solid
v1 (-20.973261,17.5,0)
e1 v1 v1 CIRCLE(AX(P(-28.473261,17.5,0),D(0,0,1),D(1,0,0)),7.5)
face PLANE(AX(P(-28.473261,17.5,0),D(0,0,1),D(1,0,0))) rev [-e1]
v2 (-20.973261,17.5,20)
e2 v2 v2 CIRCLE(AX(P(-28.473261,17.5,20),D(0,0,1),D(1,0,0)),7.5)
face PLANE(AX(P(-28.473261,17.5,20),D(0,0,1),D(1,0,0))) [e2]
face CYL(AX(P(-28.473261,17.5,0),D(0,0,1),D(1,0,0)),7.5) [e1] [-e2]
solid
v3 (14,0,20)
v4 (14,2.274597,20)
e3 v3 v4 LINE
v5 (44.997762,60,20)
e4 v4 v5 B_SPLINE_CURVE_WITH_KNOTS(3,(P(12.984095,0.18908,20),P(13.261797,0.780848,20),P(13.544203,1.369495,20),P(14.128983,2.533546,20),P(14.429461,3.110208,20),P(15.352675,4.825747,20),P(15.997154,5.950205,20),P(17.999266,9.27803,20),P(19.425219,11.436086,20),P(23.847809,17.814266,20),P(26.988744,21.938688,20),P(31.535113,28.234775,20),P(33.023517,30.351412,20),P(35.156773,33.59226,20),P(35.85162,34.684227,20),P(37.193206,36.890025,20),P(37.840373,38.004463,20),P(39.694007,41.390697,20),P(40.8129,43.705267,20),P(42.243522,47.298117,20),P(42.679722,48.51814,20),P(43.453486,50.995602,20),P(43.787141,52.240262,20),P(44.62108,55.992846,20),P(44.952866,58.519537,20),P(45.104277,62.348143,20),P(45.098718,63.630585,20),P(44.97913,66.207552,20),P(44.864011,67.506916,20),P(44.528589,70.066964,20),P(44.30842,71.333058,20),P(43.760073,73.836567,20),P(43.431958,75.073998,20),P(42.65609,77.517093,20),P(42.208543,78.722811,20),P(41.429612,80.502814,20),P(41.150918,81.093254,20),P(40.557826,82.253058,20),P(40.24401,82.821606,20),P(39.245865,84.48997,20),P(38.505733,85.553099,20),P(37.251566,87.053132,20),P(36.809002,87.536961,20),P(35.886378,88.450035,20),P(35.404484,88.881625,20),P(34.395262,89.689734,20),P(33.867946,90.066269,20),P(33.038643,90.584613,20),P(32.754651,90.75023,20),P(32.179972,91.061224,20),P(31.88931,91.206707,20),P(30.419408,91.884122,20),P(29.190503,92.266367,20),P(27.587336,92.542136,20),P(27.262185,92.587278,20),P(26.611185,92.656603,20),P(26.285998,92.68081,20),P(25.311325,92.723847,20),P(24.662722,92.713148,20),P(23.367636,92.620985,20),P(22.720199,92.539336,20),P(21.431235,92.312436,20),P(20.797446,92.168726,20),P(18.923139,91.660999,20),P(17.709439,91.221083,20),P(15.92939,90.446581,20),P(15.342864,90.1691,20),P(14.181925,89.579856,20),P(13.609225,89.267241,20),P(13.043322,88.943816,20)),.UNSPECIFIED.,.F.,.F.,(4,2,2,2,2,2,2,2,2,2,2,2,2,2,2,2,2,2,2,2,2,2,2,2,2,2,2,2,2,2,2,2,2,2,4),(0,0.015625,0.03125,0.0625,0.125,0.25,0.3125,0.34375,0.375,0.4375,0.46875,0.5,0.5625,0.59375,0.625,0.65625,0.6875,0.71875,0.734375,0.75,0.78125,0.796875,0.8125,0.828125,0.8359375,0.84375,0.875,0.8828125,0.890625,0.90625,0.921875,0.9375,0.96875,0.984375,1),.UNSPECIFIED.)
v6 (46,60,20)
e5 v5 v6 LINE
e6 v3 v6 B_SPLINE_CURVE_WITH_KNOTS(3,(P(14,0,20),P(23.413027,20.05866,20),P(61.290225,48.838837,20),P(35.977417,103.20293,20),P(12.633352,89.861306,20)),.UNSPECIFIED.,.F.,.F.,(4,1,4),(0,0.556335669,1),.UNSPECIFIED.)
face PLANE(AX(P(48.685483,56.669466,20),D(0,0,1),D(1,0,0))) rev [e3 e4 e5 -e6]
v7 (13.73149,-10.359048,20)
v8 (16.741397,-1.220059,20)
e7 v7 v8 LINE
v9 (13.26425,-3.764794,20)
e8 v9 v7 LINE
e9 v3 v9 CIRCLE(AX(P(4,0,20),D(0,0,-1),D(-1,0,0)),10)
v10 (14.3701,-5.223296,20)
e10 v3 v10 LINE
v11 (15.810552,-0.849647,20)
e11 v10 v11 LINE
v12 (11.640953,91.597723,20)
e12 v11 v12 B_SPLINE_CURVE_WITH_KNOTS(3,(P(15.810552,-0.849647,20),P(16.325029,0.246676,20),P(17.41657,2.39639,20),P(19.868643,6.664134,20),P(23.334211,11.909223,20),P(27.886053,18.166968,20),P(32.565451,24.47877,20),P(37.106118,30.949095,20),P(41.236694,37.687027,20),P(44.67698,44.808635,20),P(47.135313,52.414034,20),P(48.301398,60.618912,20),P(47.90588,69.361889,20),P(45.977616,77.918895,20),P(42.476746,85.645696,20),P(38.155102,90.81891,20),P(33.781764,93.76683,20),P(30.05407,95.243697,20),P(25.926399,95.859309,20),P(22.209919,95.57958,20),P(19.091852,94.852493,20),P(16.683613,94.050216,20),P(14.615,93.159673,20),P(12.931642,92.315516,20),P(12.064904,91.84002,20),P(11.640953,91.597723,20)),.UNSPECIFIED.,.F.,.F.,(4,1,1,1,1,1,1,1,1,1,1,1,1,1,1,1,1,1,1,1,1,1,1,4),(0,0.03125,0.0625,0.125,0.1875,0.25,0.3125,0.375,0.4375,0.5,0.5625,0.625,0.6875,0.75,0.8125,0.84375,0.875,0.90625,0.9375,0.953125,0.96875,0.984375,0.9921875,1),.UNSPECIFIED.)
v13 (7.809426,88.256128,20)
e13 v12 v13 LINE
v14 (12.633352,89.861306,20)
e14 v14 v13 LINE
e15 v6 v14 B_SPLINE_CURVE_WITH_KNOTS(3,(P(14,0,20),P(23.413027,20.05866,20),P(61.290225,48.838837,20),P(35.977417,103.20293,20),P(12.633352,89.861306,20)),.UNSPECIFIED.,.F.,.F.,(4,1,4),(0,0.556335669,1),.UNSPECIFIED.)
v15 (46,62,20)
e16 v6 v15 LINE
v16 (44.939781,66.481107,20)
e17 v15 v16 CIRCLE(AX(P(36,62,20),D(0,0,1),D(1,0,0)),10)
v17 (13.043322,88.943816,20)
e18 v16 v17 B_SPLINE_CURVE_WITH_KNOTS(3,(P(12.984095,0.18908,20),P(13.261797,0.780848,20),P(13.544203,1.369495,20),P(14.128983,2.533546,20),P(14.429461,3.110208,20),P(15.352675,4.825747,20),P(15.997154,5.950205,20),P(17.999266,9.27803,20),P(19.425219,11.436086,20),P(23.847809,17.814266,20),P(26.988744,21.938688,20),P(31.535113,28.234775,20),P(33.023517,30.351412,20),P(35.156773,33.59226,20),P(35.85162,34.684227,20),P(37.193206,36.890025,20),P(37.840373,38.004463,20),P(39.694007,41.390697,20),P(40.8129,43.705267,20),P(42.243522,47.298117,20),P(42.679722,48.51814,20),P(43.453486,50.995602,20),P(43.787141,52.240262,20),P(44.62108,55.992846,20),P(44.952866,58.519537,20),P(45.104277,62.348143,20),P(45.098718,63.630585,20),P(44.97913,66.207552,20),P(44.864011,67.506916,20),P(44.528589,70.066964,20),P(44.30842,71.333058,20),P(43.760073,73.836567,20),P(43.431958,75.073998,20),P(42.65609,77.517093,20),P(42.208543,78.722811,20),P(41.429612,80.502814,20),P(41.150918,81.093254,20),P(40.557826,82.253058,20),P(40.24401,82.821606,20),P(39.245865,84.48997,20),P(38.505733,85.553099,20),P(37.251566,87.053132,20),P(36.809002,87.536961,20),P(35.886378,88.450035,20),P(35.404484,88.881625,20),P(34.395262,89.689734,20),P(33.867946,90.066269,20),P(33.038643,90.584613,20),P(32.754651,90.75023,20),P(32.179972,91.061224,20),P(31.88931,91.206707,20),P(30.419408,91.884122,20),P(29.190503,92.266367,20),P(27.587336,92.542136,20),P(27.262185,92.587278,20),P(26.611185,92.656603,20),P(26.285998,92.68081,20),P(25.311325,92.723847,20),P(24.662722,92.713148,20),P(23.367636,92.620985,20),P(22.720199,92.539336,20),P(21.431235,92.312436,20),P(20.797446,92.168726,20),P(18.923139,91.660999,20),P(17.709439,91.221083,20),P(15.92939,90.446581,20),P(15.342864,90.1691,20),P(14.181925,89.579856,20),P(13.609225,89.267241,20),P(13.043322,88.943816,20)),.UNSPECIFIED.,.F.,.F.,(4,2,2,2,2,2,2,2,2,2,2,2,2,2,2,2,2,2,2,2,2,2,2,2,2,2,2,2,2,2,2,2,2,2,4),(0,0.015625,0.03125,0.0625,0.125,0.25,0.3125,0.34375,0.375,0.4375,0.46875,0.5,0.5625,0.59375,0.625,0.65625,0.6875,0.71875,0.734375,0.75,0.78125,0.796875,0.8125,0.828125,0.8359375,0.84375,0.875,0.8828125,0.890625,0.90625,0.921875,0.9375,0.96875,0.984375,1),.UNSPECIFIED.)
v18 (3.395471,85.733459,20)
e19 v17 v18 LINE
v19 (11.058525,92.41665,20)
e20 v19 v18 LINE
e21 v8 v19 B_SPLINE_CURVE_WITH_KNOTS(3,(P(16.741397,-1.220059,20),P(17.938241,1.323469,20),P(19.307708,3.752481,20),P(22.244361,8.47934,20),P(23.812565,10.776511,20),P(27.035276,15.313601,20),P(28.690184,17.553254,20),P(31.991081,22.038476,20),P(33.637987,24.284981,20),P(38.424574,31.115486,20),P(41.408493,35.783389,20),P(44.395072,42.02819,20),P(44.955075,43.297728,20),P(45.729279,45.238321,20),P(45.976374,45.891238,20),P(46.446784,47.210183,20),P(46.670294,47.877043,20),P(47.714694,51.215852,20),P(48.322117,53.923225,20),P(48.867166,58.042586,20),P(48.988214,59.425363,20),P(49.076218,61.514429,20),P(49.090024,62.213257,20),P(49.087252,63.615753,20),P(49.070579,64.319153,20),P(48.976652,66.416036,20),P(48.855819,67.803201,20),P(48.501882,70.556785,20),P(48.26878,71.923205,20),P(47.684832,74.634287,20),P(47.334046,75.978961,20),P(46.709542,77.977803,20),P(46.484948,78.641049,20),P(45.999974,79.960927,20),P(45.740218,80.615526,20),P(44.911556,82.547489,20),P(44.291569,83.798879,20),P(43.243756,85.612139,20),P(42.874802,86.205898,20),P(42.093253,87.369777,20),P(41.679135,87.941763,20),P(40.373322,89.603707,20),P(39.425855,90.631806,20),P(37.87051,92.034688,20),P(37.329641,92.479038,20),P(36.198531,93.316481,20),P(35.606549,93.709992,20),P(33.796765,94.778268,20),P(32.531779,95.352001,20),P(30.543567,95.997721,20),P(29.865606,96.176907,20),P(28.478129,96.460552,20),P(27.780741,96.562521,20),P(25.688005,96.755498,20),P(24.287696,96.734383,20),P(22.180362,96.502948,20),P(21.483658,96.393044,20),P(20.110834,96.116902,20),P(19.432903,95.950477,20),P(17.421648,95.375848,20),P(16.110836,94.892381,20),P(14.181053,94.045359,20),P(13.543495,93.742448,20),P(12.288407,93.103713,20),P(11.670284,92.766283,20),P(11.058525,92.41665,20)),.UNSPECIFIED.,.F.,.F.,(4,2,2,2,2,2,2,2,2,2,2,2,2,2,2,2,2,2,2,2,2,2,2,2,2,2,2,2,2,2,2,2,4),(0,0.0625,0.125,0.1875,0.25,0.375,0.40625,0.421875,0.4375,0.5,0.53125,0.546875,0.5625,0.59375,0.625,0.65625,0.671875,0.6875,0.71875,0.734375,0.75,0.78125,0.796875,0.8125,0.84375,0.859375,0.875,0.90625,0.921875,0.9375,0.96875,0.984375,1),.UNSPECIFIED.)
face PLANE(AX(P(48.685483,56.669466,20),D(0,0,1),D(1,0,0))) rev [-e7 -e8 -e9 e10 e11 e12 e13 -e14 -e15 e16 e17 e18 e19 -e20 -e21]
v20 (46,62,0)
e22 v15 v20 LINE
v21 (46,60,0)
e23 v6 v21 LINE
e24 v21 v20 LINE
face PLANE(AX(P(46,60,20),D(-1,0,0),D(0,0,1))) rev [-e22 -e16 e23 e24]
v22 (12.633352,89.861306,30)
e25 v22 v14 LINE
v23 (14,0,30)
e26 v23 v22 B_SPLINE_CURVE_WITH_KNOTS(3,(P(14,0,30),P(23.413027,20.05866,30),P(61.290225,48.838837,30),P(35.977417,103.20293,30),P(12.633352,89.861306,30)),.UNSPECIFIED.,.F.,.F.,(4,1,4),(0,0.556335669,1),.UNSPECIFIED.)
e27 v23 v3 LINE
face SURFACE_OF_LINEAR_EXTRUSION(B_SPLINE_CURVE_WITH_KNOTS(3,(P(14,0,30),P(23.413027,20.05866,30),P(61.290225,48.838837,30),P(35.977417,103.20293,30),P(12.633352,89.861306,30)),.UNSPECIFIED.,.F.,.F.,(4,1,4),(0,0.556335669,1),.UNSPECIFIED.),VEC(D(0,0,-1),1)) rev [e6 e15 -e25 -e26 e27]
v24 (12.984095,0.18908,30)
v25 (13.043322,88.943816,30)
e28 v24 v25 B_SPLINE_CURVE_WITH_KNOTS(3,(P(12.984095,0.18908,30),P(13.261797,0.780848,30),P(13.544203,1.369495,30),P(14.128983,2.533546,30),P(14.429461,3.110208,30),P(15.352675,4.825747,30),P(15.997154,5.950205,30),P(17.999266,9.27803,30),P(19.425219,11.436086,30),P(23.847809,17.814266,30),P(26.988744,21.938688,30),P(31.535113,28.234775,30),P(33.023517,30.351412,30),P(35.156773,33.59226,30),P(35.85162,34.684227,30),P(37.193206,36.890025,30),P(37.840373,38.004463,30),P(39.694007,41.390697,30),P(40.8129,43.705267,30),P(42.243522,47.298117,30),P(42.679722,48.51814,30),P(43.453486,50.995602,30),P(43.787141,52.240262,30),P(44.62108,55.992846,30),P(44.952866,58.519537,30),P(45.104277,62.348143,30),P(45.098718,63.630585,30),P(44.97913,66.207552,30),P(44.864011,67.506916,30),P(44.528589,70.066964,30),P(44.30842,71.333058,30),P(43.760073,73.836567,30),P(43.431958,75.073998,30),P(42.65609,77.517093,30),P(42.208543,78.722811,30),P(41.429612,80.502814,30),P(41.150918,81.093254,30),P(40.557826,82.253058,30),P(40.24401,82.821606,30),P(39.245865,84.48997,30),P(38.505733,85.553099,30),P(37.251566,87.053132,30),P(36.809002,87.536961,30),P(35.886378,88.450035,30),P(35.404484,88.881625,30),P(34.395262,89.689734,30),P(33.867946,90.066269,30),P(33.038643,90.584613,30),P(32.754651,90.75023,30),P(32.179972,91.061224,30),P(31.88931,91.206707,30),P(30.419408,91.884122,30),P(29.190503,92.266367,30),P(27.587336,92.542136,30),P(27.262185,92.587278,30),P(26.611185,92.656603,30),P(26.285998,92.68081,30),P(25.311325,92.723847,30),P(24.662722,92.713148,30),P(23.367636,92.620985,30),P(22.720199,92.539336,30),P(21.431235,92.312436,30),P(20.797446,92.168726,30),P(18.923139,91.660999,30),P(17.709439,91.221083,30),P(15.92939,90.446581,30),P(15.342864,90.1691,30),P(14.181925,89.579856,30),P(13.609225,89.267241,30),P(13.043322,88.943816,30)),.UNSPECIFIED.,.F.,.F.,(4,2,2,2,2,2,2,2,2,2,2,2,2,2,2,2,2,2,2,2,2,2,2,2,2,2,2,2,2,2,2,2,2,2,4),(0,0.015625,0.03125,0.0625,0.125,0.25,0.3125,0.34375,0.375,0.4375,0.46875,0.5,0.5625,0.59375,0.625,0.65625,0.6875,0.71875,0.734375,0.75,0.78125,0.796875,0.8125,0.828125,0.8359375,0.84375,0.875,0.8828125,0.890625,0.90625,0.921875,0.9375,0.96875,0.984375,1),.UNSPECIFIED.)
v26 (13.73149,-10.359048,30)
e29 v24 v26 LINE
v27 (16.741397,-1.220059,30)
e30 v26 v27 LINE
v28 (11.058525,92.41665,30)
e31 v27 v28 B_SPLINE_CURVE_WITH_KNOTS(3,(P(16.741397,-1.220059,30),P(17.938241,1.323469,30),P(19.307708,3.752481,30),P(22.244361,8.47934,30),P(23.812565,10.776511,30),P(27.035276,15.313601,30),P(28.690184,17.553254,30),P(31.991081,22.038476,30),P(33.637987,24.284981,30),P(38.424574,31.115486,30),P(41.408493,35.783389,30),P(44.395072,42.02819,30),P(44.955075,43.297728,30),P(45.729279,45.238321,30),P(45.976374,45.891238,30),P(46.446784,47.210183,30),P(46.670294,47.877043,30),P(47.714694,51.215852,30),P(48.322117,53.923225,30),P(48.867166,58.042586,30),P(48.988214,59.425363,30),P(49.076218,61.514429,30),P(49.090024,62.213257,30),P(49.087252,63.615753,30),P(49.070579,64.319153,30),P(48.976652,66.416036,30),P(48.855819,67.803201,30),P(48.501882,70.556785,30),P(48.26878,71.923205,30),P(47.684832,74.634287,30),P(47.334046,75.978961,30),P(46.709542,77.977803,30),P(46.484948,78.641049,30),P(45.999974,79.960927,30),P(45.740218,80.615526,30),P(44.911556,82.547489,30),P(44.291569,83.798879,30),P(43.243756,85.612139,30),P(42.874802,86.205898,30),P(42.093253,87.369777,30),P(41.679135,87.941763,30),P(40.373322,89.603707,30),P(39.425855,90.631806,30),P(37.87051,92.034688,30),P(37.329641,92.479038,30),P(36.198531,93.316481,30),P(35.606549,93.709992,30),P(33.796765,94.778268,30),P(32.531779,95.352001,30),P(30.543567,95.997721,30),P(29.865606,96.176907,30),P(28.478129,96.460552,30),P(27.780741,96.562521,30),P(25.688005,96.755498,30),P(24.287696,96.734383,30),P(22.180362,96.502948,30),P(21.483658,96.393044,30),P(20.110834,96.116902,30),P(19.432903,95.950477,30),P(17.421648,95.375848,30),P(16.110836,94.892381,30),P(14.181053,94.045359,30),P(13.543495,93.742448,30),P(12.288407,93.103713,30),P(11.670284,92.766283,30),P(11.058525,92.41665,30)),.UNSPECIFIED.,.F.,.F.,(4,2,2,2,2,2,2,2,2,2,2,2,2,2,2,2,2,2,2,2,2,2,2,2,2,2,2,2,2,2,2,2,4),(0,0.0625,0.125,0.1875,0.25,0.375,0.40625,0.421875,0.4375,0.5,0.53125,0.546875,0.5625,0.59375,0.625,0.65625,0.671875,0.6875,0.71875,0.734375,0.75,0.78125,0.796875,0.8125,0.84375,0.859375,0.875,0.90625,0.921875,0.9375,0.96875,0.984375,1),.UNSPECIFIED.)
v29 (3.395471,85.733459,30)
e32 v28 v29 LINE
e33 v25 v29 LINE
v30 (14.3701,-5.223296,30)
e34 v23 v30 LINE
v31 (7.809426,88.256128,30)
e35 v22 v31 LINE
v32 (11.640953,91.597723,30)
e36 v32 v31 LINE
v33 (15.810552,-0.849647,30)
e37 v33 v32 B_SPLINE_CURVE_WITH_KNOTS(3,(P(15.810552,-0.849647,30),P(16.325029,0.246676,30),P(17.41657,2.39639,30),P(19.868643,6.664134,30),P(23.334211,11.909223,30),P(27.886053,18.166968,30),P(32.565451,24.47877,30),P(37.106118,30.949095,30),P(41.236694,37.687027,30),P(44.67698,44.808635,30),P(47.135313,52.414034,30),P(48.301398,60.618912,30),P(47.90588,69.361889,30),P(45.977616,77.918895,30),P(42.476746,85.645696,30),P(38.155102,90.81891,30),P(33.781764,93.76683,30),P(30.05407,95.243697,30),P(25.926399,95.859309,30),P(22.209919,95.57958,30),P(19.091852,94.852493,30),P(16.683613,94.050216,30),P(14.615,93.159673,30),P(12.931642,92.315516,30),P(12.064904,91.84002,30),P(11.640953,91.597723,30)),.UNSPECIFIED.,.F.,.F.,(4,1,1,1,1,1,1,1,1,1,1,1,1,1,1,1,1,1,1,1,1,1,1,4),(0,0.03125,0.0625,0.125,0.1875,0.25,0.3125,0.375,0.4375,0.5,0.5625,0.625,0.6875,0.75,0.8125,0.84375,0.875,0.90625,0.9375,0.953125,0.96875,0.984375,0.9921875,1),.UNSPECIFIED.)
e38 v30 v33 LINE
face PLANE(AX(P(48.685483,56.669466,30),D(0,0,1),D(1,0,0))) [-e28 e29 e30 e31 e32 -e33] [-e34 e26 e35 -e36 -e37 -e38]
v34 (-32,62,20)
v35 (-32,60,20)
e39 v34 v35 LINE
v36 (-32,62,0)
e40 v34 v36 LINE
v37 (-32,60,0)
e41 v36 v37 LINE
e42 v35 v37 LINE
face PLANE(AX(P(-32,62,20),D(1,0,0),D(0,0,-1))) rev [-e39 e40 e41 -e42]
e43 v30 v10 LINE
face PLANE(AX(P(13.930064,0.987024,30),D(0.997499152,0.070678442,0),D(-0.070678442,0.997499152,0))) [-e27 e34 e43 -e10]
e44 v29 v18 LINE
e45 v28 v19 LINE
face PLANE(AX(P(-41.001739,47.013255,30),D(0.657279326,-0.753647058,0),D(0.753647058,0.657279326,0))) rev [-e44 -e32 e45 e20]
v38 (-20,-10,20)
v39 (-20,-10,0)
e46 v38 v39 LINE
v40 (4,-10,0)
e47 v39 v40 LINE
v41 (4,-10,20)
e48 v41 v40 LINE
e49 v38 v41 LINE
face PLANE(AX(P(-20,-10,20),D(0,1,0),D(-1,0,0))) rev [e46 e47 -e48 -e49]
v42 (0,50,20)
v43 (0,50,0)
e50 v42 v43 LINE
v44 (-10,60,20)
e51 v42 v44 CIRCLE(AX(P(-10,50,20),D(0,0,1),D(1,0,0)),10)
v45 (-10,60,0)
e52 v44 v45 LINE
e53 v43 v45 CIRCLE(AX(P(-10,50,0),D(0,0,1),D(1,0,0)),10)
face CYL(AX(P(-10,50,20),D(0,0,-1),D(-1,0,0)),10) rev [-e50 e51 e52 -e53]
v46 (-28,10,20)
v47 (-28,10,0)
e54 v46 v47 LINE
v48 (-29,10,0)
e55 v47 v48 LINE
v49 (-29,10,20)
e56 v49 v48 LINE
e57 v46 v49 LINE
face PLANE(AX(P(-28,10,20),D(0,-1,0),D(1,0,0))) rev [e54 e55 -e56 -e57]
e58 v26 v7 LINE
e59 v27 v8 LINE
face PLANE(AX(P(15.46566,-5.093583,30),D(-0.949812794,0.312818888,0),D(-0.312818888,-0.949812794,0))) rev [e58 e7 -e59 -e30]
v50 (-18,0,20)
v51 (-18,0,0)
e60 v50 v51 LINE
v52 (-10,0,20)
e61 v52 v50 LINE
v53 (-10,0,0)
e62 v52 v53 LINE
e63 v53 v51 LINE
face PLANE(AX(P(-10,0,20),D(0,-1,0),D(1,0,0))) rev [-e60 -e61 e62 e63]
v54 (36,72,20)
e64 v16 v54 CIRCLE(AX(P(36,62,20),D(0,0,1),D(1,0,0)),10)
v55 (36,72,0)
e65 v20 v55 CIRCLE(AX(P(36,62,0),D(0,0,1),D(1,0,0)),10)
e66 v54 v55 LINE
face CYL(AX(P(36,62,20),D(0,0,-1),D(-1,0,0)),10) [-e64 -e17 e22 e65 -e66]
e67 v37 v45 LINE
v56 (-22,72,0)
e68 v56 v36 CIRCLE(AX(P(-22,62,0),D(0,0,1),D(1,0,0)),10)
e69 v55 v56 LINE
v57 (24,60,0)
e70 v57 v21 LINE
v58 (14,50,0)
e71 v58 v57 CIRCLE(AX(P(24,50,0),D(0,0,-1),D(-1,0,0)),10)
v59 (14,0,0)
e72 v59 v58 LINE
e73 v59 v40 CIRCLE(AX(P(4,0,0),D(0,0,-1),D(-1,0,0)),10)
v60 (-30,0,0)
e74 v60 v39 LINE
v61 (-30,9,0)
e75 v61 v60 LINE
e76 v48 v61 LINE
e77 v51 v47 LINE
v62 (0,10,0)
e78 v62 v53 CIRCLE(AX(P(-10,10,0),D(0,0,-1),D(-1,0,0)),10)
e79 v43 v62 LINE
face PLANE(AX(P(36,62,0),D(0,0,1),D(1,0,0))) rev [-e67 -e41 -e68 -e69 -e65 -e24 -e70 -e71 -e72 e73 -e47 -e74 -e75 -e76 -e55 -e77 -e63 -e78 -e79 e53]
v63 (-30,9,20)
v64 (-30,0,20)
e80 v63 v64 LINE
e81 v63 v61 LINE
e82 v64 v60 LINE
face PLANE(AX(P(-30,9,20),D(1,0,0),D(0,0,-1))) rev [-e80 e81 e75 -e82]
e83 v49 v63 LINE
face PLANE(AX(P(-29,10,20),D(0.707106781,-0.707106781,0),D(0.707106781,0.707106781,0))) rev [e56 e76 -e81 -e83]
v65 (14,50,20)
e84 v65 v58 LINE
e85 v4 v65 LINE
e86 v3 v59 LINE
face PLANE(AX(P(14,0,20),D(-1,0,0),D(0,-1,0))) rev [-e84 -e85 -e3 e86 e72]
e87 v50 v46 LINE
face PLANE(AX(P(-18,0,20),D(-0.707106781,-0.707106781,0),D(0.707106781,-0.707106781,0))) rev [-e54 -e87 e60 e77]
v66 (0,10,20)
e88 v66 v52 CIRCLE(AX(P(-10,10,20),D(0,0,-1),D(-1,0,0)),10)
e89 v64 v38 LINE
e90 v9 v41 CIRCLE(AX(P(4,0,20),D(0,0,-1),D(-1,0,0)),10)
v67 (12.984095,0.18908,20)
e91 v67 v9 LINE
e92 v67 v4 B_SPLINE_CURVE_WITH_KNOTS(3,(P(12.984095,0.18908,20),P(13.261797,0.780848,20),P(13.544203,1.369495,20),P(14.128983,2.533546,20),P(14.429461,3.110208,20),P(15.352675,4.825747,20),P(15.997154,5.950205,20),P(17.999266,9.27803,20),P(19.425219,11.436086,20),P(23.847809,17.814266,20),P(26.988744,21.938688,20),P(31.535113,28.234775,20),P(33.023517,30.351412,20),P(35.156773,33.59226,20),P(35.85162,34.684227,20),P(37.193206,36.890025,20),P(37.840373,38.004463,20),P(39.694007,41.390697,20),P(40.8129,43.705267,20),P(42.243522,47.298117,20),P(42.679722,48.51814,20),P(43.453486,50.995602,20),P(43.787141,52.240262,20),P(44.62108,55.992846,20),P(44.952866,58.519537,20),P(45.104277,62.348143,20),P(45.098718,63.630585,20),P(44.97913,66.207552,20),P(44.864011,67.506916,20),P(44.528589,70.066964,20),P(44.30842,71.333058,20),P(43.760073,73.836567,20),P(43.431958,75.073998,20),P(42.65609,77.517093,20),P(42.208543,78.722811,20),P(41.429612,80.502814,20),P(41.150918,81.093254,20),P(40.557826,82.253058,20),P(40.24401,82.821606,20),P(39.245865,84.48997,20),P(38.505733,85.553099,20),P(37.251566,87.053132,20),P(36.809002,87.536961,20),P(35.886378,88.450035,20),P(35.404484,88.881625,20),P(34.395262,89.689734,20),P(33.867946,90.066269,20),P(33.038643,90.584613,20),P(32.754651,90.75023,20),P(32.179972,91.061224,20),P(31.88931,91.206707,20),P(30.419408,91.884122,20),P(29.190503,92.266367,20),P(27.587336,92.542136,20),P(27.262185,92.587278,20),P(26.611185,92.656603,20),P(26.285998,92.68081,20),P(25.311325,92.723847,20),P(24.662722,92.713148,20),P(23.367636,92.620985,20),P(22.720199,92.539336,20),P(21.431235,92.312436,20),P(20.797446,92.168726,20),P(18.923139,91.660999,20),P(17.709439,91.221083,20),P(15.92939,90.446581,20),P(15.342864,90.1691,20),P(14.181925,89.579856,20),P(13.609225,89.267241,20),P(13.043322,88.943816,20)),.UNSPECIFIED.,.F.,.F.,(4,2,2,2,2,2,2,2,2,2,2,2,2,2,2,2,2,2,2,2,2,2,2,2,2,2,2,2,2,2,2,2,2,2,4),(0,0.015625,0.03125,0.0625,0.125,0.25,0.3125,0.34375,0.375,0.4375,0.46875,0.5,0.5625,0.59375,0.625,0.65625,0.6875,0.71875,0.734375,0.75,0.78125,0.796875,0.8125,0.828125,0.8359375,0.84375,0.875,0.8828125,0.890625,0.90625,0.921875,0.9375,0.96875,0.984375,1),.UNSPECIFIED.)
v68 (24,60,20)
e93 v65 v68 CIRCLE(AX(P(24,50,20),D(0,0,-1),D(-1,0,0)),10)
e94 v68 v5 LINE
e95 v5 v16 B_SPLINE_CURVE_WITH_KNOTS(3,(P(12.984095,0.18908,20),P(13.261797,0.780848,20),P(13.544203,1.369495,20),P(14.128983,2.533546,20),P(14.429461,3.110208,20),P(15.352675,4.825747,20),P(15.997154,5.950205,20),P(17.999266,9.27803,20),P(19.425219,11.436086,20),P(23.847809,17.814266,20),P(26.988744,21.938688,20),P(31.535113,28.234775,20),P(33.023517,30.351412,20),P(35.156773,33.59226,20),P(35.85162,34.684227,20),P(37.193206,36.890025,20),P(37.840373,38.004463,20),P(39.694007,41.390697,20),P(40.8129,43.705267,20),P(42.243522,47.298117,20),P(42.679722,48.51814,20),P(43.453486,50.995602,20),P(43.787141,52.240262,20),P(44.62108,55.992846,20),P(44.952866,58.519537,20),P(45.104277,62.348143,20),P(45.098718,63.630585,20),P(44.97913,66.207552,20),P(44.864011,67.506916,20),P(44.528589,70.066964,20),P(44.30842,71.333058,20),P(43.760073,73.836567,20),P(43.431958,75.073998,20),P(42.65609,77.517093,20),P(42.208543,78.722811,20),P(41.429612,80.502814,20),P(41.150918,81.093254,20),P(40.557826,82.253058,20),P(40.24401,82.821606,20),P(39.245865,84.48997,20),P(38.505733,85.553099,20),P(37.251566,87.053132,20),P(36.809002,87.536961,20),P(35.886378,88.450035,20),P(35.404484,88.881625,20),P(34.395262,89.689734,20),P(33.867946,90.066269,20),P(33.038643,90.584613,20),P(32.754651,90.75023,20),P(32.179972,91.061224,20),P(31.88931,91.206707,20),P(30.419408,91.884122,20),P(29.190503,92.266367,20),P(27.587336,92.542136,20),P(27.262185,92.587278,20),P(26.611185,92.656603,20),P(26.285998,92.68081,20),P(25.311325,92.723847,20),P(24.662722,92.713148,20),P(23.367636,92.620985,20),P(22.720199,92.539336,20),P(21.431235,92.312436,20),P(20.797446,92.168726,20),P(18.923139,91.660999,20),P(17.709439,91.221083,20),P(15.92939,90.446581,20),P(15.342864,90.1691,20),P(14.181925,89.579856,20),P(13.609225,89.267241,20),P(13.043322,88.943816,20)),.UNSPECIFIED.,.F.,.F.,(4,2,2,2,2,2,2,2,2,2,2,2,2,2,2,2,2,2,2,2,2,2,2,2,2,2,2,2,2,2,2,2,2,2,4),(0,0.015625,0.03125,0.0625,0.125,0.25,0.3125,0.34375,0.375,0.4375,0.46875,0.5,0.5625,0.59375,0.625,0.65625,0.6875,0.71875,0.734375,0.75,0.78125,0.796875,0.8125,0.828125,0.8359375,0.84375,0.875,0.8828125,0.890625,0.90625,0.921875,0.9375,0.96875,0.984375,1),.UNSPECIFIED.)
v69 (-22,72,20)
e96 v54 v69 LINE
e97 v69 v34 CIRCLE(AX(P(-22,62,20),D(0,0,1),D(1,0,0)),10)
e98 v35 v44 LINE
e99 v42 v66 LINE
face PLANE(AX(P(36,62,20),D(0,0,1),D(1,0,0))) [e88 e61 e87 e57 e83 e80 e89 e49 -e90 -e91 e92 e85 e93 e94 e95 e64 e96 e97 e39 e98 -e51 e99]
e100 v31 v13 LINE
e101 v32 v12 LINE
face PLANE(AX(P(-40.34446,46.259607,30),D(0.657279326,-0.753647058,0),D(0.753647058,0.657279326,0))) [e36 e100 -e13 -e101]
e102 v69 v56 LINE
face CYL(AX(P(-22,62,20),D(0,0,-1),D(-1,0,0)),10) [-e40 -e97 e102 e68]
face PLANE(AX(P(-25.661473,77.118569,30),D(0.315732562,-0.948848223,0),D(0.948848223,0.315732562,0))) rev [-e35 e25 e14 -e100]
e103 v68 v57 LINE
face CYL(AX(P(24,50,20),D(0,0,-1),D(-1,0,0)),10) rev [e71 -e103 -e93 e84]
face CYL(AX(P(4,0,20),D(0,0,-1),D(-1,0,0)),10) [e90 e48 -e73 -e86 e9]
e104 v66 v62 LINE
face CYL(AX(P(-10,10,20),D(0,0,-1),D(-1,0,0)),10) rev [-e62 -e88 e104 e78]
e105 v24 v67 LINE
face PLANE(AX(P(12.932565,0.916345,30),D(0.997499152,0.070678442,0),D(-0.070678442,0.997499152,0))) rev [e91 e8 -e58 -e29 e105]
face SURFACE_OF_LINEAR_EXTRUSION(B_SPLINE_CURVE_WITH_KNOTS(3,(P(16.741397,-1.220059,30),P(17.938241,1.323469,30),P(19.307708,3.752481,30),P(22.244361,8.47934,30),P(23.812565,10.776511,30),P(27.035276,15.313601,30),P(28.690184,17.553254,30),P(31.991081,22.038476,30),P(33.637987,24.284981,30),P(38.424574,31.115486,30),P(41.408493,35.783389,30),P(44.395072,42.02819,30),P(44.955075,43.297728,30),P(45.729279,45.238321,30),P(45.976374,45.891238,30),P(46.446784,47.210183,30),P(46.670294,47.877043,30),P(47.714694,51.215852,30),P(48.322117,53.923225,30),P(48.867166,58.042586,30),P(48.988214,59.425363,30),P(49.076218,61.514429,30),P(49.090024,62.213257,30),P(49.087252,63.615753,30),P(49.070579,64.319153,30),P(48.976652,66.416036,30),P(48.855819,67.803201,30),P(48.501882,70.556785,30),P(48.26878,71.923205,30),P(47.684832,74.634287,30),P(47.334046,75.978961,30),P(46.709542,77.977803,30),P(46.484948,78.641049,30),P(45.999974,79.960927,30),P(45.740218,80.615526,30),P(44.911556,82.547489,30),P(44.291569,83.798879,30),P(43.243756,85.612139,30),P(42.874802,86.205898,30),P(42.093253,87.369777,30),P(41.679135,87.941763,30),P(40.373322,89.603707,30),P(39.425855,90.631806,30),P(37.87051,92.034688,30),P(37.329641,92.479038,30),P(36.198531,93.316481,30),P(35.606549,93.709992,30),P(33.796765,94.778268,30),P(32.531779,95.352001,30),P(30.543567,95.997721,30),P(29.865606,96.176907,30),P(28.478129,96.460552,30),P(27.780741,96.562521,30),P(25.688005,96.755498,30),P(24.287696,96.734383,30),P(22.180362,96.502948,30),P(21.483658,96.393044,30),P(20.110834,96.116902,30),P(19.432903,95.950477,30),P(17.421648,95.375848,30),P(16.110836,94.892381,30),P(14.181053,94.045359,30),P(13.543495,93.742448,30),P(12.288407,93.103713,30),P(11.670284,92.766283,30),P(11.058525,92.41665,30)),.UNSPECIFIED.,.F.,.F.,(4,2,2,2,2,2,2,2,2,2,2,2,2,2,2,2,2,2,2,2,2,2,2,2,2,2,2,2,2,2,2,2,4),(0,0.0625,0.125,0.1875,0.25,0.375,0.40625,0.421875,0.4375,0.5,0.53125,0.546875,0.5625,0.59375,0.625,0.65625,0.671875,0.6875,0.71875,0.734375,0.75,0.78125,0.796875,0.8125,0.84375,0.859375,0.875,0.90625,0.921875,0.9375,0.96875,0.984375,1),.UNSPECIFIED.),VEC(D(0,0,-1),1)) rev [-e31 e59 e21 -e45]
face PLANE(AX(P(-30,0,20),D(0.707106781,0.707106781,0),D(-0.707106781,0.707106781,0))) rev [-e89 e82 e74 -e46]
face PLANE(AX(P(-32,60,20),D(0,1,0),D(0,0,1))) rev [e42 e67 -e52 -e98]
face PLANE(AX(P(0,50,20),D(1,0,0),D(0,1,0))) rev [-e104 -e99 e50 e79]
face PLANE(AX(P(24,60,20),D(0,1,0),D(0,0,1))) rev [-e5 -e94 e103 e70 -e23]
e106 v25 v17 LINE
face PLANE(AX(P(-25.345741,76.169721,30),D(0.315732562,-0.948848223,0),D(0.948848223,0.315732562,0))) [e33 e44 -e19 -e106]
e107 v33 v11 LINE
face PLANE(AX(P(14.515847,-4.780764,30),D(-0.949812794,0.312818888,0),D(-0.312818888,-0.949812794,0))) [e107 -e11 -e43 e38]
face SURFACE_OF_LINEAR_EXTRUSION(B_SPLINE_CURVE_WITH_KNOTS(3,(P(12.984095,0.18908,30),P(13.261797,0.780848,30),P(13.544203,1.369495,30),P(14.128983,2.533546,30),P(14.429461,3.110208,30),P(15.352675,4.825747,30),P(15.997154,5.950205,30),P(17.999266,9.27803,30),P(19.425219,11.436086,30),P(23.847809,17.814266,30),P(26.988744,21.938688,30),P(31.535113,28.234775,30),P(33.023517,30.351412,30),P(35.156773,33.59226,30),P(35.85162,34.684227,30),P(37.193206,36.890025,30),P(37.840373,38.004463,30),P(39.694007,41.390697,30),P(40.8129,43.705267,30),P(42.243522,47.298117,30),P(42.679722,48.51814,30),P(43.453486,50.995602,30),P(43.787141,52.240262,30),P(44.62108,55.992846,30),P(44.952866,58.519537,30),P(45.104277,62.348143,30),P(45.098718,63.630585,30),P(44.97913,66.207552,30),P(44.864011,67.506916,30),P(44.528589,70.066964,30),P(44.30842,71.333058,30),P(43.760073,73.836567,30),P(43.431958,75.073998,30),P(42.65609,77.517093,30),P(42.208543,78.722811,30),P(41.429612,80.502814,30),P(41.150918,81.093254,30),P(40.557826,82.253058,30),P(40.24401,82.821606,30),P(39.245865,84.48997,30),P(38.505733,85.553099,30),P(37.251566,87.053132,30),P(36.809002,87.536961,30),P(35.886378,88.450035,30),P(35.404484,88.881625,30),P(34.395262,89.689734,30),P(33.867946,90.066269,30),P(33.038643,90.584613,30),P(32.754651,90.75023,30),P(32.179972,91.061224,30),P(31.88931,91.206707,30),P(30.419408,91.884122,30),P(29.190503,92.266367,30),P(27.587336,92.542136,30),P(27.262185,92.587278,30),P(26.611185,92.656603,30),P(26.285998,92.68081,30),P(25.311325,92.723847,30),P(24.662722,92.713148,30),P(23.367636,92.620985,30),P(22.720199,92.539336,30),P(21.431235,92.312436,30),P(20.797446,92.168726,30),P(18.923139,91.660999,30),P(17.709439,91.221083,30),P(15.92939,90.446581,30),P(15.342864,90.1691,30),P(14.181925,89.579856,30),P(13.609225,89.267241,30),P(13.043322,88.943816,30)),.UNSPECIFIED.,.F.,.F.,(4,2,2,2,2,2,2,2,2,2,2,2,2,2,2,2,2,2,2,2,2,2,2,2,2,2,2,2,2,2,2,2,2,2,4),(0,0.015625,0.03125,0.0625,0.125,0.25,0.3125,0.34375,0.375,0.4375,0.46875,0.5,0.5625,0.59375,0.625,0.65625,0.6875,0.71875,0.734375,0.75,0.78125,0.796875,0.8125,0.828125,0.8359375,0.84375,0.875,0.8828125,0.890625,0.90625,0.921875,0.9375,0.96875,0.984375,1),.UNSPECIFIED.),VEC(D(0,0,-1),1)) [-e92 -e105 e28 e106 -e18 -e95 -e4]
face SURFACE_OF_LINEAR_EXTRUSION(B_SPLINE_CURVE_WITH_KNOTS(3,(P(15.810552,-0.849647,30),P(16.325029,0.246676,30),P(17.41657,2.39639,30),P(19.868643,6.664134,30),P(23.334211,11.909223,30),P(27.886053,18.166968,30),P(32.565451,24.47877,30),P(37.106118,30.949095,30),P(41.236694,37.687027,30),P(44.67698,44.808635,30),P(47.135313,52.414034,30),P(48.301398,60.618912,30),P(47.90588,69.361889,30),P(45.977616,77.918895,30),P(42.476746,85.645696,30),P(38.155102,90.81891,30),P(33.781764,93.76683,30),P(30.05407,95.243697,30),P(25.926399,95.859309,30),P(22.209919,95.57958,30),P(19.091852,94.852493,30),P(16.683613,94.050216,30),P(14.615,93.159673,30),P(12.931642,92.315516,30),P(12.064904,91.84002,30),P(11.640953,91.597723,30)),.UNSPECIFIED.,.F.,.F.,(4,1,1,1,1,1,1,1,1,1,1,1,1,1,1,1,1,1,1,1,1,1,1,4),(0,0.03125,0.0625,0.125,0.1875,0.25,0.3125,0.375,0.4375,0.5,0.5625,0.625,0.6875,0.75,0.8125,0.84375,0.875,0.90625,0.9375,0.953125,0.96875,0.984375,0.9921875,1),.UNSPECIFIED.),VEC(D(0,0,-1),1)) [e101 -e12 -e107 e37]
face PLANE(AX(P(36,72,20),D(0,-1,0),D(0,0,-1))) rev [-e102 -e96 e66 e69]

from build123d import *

# Parameters (mm, degrees)
BOSS_EXTRUDE1_DEPTH = 20
EXTRUDE_THIN1_DEPTH = 10
SKETCH5_R           = 7.5
BOSS_EXTRUDE2_DEPTH = 20


# Read off the part's stored shape, not the designer's step: Extrude-Thin1
with BuildPart() as part:
    # Sketch1 → Boss-Extrude1 (new body)
    with BuildSketch(Plane.XY):
        with BuildLine():
            Line((-10, 0), (-18, 0))
            Line((-18, 0), (-28, 10))
            Line((-28, 10), (-29, 10))
            Line((-29, 10), (-30, 9))
            Line((-30, 9), (-30, 0))
            Line((-30, 0), (-20, -10))
            Line((-20, -10), (4, -10))
            ThreePointArc((4, -10), (11.071067812, -7.071067812), (14, 0))
            Line((14, 0), (14, 50))
            ThreePointArc((14, 50), (16.928932188, 57.071067812), (24, 60))
            Line((24, 60), (46, 60))
            Line((46, 60), (46, 62))
            ThreePointArc((46, 62), (43.071067812, 69.071067812), (36, 72))
            Line((36, 72), (-22, 72))
            ThreePointArc((-22, 72), (-29.071067812, 69.071067812), (-32, 62))
            Line((-32, 62), (-32, 60))
            Line((-32, 60), (-10, 60))
            ThreePointArc((-10, 60), (-2.928932188, 57.071067812), (0, 50))
            Line((0, 50), (0, 10))
            ThreePointArc((0, 10), (-2.928932188, 2.928932188), (-10, 0))
        make_face()
    extrude(amount=BOSS_EXTRUDE1_DEPTH)

    # Extrude-Thin1 outline → Extrude-Thin1 (add)
    with BuildSketch(Plane.XY.offset(20)):
        with BuildLine():
            Line((13.73148986, -10.359047867), (16.741396884, -1.220059446))
            add(Edge.make_bspline(
                [(16.741396884, -1.220059446), (17.938240855, 1.323469225), (19.307708402, 3.752480804), (22.244361382, 8.479339506), (23.812565414, 10.776510898), (27.035275719, 15.313601471), (28.690184228, 17.553253811), (31.991080828, 22.038476224), (33.637986515, 24.284980825), (38.424574069, 31.115486386), (41.408492734, 35.783389329), (44.395072339, 42.028190425), (44.95507469, 43.297728181), (45.729279361, 45.238321303), (45.976373543, 45.891237597), (46.446784447, 47.210182884), (46.670294458, 47.877042866), (47.714694496, 51.215852174), (48.322116947, 53.923225355), (48.86716598, 58.042586022), (48.988213777, 59.425362719), (49.076217631, 61.514428935), (49.090024461, 62.213257221), (49.087251753, 63.615752982), (49.070578711, 64.319153164), (48.976651737, 66.416036203), (48.855819179, 67.803201228), (48.501882233, 70.556785471), (48.268780425, 71.923205167), (47.684831673, 74.634287385), (47.33404649, 75.978961319), (46.709542441, 77.977803302), (46.484948091, 78.641048673), (45.999973816, 79.960926888), (45.740217846, 80.615526301), (44.911555517, 82.547489325), (44.291569032, 83.798878974), (43.243756398, 85.612139279), (42.874801633, 86.205897607), (42.093252638, 87.369776955), (41.679134889, 87.941763226), (40.373322387, 89.60370733), (39.425854628, 90.63180605), (37.870510106, 92.034688127), (37.329640806, 92.479038062), (36.19853105, 93.316481218), (35.606549323, 93.709991891), (33.796764696, 94.778267797), (32.531779498, 95.352000631), (30.543567471, 95.997721333), (29.865605841, 96.176907114), (28.478128706, 96.460552184), (27.780741346, 96.562520522), (25.688004954, 96.755498301), (24.287696072, 96.734383445), (22.180361797, 96.502947526), (21.483658094, 96.393044193), (20.110834488, 96.116901703), (19.432903121, 95.950477369), (17.421648072, 95.375848366), (16.110835589, 94.892380819), (14.181053464, 94.045359098), (13.5434948, 93.742447874), (12.288407262, 93.103712794), (11.670283671, 92.766283002), (11.058524625, 92.416649831)],
                knots=[0, 0, 0, 0, 0.0625, 0.0625, 0.125, 0.125, 0.1875, 0.1875, 0.25, 0.25, 0.375, 0.375, 0.40625, 0.40625, 0.421875, 0.421875, 0.4375, 0.4375, 0.5, 0.5, 0.53125, 0.53125, 0.546875, 0.546875, 0.5625, 0.5625, 0.59375, 0.59375, 0.625, 0.625, 0.65625, 0.65625, 0.671875, 0.671875, 0.6875, 0.6875, 0.71875, 0.71875, 0.734375, 0.734375, 0.75, 0.75, 0.78125, 0.78125, 0.796875, 0.796875, 0.8125, 0.8125, 0.84375, 0.84375, 0.859375, 0.859375, 0.875, 0.875, 0.90625, 0.90625, 0.921875, 0.921875, 0.9375, 0.9375, 0.96875, 0.96875, 0.984375, 0.984375, 1, 1, 1, 1], degree=3))
            Line((11.058524625, 92.416649831), (3.395470658, 85.73345921))
            Line((3.395470658, 85.73345921), (13.043322477, 88.943815616))
            add(Edge.make_bspline(
                [(12.984095469, 0.189080392), (13.261797049, 0.780847724), (13.544202903, 1.369495068), (14.128982979, 2.533546248), (14.429461172, 3.110207578), (15.352675472, 4.825746728), (15.997153895, 5.950204518), (17.999265958, 9.278029772), (19.425218913, 11.43608621), (23.847809312, 17.814266063), (26.988743693, 21.938688252), (31.535112958, 28.23477496), (33.023516937, 30.351412365), (35.156773016, 33.592259728), (35.851619954, 34.684226984), (37.19320582, 36.890024529), (37.840373262, 38.004462966), (39.694006852, 41.390696998), (40.812899945, 43.705266889), (42.243521786, 47.298117326), (42.679721979, 48.518139619), (43.453486056, 50.995602181), (43.787141344, 52.240262022), (44.621079781, 55.992845574), (44.952865574, 58.519537042), (45.104277149, 62.348142544), (45.098718071, 63.630585128), (44.979130066, 66.207552003), (44.864011143, 67.506916098), (44.528589217, 70.066963523), (44.308419924, 71.33305785), (43.760072877, 73.836566763), (43.431958037, 75.073998054), (42.656090183, 77.517092827), (42.208542731, 78.722810893), (41.429612055, 80.502814187), (41.150917716, 81.093254), (40.55782601, 82.253058494), (40.244009978, 82.82160586), (39.245864754, 84.489970459), (38.505733349, 85.553098585), (37.251565625, 87.05313228), (36.809002202, 87.536961226), (35.886378091, 88.450034762), (35.4044844, 88.881624917), (34.395261664, 89.689733894), (33.867946067, 90.066269015), (33.038643006, 90.584613031), (32.754651161, 90.750229859), (32.179971757, 91.061223792), (31.889309524, 91.206707046), (30.41940811, 91.884122288), (29.190503028, 92.26636718), (27.587336181, 92.542136319), (27.262184559, 92.587277805), (26.611184933, 92.656602561), (26.285998299, 92.680809615), (25.311324544, 92.723847227), (24.662721974, 92.713147507), (23.367636487, 92.620984522), (22.720198773, 92.539335562), (21.431235483, 92.312436181), (20.797445687, 92.168725542), (18.923138973, 91.660998622), (17.709439107, 91.221082518), (15.929389806, 90.44658053), (15.342863868, 90.16909984), (14.181924608, 89.579856337), (13.609225337, 89.267241012), (13.043322477, 88.943815616)],
                knots=[0, 0, 0, 0, 0.015625, 0.015625, 0.03125, 0.03125, 0.0625, 0.0625, 0.125, 0.125, 0.25, 0.25, 0.3125, 0.3125, 0.34375, 0.34375, 0.375, 0.375, 0.4375, 0.4375, 0.46875, 0.46875, 0.5, 0.5, 0.5625, 0.5625, 0.59375, 0.59375, 0.625, 0.625, 0.65625, 0.65625, 0.6875, 0.6875, 0.71875, 0.71875, 0.734375, 0.734375, 0.75, 0.75, 0.78125, 0.78125, 0.796875, 0.796875, 0.8125, 0.8125, 0.828125, 0.828125, 0.8359375, 0.8359375, 0.84375, 0.84375, 0.875, 0.875, 0.8828125, 0.8828125, 0.890625, 0.890625, 0.90625, 0.90625, 0.921875, 0.921875, 0.9375, 0.9375, 0.96875, 0.96875, 0.984375, 0.984375, 1, 1, 1, 1], degree=3))
            Line((12.984095469, 0.189080392), (13.73148986, -10.359047867))
        make_face()
        with BuildLine():
            add(Edge.make_bspline(
                [(15.810552446, -0.849646892), (16.325029135, 0.246675635), (17.416570039, 2.396390397), (19.868642716, 6.664133605), (23.334211223, 11.909222729), (27.886053322, 18.166968374), (32.565450825, 24.478770316), (37.106117738, 30.949094987), (41.236694479, 37.687027442), (44.676980175, 44.808635171), (47.135313488, 52.414034167), (48.301398377, 60.618911739), (47.90588021, 69.361888608), (45.977615911, 77.918895481), (42.476746042, 85.645696397), (38.155102392, 90.8189096), (33.781763935, 93.766830125), (30.054070359, 95.243697473), (25.926399271, 95.859309256), (22.209918519, 95.579579954), (19.091851854, 94.852492514), (16.683612614, 94.050216163), (14.614999506, 93.159672681), (12.931642394, 92.315516301), (12.064904025, 91.84001985), (11.640953043, 91.59772294)],
                knots=[0, 0, 0, 0, 0.03125, 0.0625, 0.125, 0.1875, 0.25, 0.3125, 0.375, 0.4375, 0.5, 0.5625, 0.625, 0.6875, 0.75, 0.8125, 0.84375, 0.875, 0.90625, 0.9375, 0.953125, 0.96875, 0.984375, 0.9921875, 1, 1, 1, 1], degree=3))
            Line((15.810552446, -0.849646892), (14.37010001, -5.22329632))
            Line((14.37010001, -5.22329632), (14, 0))
            add(Edge.make_bspline(
                [(14, 0), (23.413026625, 20.058660289), (61.290224665, 48.838836775), (35.977417085, 103.202930404), (12.633351969, 89.861305832)],
                knots=[0, 0, 0, 0, 0.556335669, 1, 1, 1, 1], degree=3))
            Line((12.633351969, 89.861305832), (7.80942606, 88.25612763))
            Line((7.80942606, 88.25612763), (11.640953043, 91.59772294))
        make_face(mode=Mode.SUBTRACT)
    extrude(amount=EXTRUDE_THIN1_DEPTH)


with BuildPart() as body_2:
    # Sketch5 → Boss-Extrude2 (new, through all)
    with BuildSketch(Plane.XY.offset(20)):
        with Locations((-28.47326066, 17.5)):
            Circle(SKETCH5_R)
    extrude(amount=-BOSS_EXTRUDE2_DEPTH)


solid = Compound([part.part, body_2.part])
